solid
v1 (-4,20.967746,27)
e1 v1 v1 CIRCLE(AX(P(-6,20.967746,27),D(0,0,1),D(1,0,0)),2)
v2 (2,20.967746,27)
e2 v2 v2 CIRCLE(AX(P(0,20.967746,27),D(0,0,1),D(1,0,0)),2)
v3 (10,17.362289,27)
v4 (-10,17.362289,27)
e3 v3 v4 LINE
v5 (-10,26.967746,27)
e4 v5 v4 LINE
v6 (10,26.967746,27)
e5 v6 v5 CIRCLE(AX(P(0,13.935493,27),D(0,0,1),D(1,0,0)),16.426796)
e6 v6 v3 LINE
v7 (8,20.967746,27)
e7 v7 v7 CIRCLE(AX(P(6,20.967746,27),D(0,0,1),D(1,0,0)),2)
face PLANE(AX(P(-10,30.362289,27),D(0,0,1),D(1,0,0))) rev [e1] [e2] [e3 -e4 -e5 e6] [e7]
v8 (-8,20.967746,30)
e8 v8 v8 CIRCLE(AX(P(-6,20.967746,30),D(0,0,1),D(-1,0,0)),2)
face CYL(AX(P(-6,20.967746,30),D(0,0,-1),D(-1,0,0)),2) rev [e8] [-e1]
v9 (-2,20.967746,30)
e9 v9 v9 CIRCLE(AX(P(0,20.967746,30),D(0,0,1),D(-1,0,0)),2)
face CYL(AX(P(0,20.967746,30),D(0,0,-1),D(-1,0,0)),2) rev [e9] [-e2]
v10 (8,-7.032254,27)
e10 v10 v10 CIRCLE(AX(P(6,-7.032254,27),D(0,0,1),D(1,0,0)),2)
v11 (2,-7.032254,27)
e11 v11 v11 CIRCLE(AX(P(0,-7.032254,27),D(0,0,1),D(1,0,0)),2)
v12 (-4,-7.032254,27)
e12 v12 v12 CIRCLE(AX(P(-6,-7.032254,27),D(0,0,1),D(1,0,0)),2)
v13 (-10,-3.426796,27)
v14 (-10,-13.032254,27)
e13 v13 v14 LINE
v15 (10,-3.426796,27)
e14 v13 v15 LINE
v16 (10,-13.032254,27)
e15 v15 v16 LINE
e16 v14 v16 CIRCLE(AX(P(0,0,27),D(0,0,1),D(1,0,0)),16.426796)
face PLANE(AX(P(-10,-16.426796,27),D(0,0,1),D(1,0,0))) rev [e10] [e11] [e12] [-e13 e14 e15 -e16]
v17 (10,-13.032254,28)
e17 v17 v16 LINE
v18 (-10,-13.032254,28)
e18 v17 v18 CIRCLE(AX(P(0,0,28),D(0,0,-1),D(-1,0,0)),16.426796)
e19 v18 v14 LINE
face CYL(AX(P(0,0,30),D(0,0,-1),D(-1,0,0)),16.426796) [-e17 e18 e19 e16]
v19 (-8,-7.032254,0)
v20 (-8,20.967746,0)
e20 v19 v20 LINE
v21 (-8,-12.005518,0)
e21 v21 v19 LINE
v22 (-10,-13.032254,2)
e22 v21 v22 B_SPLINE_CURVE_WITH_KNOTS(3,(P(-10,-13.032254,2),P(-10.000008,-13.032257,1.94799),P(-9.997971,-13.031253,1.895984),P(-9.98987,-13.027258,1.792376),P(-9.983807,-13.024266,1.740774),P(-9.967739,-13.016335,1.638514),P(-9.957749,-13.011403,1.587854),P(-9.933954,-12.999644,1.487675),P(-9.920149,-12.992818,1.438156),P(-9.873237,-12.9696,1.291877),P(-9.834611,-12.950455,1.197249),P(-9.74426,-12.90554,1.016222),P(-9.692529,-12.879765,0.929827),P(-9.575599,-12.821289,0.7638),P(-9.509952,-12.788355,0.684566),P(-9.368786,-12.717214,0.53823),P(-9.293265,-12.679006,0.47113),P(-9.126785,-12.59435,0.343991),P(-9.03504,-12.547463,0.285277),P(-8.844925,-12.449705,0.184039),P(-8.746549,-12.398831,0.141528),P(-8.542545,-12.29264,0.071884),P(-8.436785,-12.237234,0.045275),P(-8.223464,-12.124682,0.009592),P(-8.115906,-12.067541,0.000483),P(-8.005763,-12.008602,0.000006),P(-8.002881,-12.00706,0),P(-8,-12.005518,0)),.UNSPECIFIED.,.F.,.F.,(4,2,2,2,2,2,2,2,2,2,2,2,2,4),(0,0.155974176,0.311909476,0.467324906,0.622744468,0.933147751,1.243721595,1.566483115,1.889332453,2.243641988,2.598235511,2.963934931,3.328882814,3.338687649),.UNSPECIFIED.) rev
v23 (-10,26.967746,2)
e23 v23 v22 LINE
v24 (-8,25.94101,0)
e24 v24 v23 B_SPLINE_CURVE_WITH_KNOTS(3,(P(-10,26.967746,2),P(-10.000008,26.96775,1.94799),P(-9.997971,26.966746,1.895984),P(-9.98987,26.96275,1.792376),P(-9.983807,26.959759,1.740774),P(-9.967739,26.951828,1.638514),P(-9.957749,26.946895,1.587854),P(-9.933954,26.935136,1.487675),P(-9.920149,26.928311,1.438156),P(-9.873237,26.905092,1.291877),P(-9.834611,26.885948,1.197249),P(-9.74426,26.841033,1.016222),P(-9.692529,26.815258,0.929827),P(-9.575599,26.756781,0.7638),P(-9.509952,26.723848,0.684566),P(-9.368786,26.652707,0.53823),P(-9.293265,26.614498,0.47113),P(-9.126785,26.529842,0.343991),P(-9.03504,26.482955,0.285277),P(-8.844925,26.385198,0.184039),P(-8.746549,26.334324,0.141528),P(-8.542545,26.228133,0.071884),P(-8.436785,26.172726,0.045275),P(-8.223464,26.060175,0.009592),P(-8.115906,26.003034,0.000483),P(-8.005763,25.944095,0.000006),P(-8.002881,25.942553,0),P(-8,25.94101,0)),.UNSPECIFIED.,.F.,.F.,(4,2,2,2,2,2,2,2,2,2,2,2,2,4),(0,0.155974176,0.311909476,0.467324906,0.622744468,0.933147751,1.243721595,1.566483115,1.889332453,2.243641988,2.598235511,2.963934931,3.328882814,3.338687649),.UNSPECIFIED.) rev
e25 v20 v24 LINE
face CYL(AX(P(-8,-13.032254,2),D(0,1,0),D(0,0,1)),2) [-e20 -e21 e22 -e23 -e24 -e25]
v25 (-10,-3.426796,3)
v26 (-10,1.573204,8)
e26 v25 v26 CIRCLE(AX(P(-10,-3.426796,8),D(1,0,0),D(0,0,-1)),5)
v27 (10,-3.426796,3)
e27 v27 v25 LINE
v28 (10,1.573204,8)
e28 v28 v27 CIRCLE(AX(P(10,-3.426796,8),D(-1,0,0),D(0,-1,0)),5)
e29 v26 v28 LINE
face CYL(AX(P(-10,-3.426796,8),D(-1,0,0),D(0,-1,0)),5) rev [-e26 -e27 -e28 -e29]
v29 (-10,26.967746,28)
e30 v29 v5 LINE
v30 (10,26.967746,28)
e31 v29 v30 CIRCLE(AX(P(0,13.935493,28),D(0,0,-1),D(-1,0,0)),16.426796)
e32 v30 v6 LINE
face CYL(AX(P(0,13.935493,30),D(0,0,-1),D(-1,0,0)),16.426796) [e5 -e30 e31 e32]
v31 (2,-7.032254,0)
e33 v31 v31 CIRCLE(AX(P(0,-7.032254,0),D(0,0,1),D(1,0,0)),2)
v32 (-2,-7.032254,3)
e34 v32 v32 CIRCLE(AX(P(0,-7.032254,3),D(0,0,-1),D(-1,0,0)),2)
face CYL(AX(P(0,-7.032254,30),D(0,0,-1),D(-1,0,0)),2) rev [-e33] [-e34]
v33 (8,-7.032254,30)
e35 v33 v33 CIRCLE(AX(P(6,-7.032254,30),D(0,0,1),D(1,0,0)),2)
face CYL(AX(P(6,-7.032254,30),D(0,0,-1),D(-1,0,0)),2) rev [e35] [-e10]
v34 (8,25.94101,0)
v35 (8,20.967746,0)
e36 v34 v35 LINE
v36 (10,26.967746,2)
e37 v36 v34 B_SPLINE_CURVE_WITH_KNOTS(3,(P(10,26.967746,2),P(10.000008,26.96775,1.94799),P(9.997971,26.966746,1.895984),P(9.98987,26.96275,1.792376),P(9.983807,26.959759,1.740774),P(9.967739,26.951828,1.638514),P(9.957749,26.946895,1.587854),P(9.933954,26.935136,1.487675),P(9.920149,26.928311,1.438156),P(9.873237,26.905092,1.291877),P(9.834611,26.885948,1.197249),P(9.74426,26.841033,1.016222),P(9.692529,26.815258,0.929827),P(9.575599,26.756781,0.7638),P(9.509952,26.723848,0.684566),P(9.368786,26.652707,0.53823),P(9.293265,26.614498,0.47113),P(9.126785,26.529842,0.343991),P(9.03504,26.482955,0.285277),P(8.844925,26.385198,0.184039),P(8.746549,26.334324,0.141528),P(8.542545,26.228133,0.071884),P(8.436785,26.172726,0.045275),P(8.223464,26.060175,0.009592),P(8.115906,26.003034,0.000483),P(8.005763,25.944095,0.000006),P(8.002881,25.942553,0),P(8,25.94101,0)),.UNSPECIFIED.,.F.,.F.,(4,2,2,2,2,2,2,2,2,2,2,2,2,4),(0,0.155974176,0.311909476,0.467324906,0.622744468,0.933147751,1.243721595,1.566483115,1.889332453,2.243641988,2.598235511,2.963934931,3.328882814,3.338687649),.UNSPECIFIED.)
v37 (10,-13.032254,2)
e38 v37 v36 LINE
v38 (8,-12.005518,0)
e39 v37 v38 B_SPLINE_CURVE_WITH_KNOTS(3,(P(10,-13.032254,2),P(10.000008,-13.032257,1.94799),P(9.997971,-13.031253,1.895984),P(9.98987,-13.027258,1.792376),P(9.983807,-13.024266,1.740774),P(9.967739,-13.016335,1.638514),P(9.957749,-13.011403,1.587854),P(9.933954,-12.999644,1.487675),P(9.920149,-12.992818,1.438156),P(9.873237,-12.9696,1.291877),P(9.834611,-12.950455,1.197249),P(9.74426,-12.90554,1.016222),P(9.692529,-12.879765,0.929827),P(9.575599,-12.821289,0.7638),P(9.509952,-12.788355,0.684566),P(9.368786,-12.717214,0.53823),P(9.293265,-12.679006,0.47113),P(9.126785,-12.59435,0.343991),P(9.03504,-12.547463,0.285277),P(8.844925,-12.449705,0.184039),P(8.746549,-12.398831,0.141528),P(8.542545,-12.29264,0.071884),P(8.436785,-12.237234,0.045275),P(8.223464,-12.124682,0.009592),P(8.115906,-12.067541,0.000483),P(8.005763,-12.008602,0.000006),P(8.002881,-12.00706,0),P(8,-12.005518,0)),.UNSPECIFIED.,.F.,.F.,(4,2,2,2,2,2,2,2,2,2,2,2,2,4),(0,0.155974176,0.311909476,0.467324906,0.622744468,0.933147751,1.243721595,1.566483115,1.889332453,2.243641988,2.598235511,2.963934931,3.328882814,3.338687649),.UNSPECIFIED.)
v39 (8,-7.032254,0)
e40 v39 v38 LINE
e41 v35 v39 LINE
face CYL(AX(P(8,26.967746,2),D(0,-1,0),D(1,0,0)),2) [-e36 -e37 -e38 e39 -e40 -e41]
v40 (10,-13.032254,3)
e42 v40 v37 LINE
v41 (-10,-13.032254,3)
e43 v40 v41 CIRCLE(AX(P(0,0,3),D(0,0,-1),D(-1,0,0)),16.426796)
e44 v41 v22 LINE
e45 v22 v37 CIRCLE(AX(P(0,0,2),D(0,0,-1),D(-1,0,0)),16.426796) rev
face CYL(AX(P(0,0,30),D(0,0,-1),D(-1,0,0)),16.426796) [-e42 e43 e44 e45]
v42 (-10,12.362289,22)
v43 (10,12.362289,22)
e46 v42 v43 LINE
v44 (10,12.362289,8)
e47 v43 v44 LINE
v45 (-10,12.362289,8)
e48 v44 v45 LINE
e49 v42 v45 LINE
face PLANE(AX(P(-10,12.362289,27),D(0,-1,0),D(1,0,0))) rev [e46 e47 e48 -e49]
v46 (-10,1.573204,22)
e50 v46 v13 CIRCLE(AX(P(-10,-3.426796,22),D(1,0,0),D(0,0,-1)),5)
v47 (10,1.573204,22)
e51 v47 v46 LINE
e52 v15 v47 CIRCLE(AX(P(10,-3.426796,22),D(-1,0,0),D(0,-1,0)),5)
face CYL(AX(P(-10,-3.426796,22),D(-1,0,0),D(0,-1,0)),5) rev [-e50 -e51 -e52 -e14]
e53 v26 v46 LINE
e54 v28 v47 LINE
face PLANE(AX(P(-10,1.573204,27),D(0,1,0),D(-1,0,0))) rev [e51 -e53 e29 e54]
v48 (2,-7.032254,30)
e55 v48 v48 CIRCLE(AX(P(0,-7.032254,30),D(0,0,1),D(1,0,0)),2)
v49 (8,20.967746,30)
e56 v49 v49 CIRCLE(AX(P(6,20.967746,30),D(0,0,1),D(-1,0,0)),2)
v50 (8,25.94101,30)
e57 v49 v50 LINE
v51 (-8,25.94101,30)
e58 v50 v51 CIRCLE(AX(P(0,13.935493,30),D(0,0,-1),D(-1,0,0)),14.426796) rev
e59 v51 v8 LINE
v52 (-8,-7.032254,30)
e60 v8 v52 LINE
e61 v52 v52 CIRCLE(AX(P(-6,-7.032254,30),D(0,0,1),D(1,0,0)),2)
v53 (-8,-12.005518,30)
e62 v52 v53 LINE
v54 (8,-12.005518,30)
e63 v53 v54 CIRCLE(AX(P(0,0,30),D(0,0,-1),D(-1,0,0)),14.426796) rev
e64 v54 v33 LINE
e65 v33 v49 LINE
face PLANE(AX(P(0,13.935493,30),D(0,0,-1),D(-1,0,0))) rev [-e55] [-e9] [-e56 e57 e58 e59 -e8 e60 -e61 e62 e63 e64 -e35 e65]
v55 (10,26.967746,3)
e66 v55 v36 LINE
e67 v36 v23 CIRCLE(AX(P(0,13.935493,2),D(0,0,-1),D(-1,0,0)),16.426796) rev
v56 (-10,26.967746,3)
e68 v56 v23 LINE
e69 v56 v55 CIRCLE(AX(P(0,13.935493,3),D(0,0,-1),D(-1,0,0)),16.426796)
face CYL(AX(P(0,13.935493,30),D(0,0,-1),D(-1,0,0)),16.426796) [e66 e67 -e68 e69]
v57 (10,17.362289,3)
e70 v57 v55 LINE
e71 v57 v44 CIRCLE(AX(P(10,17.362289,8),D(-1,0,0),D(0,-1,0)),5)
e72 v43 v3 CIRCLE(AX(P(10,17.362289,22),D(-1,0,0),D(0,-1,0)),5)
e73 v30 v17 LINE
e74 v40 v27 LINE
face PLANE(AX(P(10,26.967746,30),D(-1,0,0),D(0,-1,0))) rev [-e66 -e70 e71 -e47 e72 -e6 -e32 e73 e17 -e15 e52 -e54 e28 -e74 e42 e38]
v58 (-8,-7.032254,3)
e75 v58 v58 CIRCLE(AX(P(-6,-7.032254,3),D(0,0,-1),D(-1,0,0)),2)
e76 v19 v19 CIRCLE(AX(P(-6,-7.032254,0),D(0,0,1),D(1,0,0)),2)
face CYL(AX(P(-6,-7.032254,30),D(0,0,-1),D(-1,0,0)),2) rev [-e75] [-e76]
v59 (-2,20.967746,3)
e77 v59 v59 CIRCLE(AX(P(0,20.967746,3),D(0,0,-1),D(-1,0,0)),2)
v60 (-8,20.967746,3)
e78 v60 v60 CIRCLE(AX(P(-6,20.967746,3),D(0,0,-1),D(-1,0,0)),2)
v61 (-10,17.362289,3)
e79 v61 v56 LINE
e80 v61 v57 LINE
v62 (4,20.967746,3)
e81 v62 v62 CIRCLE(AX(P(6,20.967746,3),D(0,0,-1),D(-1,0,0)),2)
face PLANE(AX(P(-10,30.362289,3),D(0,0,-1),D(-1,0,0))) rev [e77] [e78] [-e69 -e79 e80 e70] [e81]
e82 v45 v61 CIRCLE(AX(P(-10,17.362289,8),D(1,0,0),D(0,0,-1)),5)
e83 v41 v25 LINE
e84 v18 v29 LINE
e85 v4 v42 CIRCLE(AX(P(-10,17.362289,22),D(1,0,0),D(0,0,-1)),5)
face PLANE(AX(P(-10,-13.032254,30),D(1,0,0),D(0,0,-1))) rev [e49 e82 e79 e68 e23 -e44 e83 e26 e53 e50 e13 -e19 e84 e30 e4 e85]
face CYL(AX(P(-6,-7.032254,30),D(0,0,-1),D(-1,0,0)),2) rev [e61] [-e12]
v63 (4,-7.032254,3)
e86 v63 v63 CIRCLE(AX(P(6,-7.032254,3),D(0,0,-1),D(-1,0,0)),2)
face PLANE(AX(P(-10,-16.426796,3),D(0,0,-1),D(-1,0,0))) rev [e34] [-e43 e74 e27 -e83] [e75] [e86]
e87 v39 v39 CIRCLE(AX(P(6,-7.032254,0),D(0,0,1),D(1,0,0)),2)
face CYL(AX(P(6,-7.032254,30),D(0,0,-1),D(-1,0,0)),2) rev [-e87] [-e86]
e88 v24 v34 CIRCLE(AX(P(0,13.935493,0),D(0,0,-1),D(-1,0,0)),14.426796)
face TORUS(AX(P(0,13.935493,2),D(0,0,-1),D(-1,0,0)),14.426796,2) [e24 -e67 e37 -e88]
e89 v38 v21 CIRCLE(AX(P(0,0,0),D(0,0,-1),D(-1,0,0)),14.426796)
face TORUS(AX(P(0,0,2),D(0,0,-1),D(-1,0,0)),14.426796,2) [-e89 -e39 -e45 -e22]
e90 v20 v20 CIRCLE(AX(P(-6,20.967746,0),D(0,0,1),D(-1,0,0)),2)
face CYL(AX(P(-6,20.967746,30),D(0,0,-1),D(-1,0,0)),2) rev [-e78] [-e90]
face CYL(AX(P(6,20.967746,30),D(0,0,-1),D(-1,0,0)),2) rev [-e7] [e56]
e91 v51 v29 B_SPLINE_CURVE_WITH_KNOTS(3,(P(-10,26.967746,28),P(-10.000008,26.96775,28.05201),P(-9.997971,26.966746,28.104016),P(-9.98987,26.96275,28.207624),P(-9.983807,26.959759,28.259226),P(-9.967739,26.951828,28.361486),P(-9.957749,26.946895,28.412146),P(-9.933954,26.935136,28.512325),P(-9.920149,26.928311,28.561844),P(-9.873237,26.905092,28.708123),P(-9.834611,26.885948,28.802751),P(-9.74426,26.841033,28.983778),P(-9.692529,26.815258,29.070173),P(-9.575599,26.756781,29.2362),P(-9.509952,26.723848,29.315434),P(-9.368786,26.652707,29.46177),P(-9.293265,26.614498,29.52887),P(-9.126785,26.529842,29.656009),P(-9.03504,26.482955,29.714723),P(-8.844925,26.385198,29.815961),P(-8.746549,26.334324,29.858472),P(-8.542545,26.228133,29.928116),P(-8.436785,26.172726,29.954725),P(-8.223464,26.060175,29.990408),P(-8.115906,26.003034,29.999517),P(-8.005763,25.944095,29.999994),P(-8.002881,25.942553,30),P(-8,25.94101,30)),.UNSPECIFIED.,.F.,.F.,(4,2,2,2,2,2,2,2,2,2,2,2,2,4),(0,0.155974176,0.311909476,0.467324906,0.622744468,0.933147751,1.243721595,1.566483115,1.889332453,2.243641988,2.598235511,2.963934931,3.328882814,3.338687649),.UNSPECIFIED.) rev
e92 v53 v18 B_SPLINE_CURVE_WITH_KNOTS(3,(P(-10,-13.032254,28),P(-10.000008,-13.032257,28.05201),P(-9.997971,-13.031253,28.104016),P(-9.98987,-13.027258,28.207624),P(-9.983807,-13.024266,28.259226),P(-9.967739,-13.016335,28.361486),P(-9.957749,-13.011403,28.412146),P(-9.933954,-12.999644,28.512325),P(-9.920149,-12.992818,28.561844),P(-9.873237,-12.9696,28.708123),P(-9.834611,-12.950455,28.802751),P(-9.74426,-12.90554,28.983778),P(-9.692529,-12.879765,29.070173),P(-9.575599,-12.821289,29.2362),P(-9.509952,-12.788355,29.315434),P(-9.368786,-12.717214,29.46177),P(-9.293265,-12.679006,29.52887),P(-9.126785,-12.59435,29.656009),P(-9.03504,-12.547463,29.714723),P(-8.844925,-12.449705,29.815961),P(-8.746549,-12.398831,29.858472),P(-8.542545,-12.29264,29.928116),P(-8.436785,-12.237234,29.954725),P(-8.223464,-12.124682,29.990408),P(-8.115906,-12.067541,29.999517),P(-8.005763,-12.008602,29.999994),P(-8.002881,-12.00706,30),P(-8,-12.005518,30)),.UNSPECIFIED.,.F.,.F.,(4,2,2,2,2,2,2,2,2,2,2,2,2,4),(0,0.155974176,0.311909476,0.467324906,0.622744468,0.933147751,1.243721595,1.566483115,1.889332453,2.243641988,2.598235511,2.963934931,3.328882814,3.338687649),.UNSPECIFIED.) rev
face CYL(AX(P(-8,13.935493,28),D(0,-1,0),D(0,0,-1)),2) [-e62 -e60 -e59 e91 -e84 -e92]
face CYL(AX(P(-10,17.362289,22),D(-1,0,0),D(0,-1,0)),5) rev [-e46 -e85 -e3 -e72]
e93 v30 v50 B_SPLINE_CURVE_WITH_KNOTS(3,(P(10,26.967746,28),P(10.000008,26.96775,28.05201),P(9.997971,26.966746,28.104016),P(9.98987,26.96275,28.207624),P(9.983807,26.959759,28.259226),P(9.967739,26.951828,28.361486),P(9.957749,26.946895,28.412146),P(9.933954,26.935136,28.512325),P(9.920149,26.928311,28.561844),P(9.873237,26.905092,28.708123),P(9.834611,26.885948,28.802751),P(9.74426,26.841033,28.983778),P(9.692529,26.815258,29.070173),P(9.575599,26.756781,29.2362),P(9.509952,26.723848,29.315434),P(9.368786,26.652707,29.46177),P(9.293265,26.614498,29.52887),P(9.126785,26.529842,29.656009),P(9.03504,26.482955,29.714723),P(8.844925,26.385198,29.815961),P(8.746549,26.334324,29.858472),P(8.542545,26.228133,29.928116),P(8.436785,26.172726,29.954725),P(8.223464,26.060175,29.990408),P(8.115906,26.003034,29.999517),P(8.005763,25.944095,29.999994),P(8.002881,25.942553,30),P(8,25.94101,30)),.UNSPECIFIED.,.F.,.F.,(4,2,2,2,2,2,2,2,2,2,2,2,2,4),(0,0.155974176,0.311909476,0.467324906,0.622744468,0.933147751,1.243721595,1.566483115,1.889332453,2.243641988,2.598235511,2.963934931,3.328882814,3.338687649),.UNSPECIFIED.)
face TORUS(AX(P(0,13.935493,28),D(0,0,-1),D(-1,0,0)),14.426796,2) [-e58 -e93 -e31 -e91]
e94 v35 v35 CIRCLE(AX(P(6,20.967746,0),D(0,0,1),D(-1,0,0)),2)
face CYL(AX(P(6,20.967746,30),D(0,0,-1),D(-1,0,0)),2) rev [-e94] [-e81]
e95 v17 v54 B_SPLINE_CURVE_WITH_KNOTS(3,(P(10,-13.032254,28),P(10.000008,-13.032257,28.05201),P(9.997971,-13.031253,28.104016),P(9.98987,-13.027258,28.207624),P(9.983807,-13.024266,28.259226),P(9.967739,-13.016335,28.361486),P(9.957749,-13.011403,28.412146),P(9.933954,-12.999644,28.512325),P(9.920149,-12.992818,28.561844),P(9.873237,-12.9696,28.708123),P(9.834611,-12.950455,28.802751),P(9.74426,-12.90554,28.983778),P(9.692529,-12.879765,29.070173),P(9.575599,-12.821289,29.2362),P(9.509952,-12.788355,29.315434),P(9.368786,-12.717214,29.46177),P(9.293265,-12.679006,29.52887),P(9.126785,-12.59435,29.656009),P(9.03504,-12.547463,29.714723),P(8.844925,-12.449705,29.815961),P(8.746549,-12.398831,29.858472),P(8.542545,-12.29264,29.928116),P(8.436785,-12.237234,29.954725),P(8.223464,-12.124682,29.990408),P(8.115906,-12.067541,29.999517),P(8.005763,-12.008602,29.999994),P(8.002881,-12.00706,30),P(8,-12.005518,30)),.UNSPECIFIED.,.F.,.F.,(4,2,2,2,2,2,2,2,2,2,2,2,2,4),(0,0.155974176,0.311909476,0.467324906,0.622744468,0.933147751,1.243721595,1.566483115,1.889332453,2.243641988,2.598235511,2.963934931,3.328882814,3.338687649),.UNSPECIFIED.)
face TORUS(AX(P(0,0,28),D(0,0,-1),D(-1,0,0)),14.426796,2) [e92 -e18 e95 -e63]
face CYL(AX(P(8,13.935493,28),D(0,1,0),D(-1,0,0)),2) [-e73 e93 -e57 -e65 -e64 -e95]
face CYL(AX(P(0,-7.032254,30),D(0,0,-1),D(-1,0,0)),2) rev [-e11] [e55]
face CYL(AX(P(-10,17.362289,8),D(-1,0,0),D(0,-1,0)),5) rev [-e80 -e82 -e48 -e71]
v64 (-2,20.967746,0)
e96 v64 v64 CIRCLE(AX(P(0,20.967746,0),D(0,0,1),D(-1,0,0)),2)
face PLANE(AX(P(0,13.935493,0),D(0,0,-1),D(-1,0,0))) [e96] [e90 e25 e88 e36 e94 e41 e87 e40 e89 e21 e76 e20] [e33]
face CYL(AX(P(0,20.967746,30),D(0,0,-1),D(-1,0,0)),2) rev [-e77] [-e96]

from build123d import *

# Parameters (mm, degrees)
SKETCH1_R           = 2
BOSS_EXTRUDE1_DEPTH = 30
SKETCH2_W           = 24
SKETCH2_H           = 18
CUT_EXTRUDE1_DEPTH  = 48.136701039
FILLET1_R           = 5
FILLET2_R           = 2


with BuildPart() as part:
    # Sketch1 → Boss-Extrude1 (new body)
    with BuildSketch(Plane.XY):
        with BuildLine():
            Line((-10, -13.032253728), (-10, 26.967746272))
            ThreePointArc((-10, 26.967746272), (0, 30.36228886), (10, 26.967746272))
            Line((10, 26.967746272), (10, -13.032253728))
            ThreePointArc((10, -13.032253728), (0, -16.426796317), (-10, -13.032253728))
        make_face()
        with Locations((0, -7.032253728)):
            Circle(SKETCH1_R, mode=Mode.SUBTRACT)
        with Locations((6, -7.032253728)):
            Circle(SKETCH1_R, mode=Mode.SUBTRACT)
        with Locations((-6, -7.032253728)):
            Circle(SKETCH1_R, mode=Mode.SUBTRACT)
        with Locations(Location((6, 20.967746272, 0), (0, 0, 180))):
            Circle(SKETCH1_R, mode=Mode.SUBTRACT)
        with Locations(Location((0, 20.967746272, 0), (0, 0, 180))):
            Circle(SKETCH1_R, mode=Mode.SUBTRACT)
        with Locations(Location((-6, 20.967746272, 0), (0, 0, 180))):
            Circle(SKETCH1_R, mode=Mode.SUBTRACT)
    extrude(amount=BOSS_EXTRUDE1_DEPTH)

    # Sketch2 → Cut-Extrude1 (cut, through all)
    with BuildSketch(Plane(origin=(10, 0, 0), x_dir=(0, 0, -1), z_dir=(1, 0, 0))):
        with Locations((-15, -7.426796317)):
            Rectangle(SKETCH2_W, SKETCH2_H)
        with Locations((-15, 21.36228886)):
            Rectangle(SKETCH2_W, SKETCH2_H)
    extrude(amount=-CUT_EXTRUDE1_DEPTH, mode=Mode.SUBTRACT)

    # Fillet1
    fillet1_edges = [part.edges().sort_by_distance(p)[0] for p in [
        (0, 1.573203683, 3),
        (0, 1.573203683, 27),
        (0, 12.36228886, 27),
        (0, 12.36228886, 3),
    ]]
    fillet(fillet1_edges, radius=FILLET1_R)

    # Fillet2
    fillet2_edges = [part.edges().sort_by_distance(p)[0] for p in [
        (0, -16.426796317, 30),
        (10, 6.967746272, 30),
        (0, 30.36228886, 30),
        (10, 6.967746272, 0),
        (0, -16.426796317, 0),
        (-10, 6.967746272, 0),
        (0, 30.36228886, 0),
        (-10, 6.967746272, 30),
    ]]
    fillet(fillet2_edges, radius=FILLET2_R - 0.0001)  # a hair under: the kernel refuses the full size


solid = part.part
